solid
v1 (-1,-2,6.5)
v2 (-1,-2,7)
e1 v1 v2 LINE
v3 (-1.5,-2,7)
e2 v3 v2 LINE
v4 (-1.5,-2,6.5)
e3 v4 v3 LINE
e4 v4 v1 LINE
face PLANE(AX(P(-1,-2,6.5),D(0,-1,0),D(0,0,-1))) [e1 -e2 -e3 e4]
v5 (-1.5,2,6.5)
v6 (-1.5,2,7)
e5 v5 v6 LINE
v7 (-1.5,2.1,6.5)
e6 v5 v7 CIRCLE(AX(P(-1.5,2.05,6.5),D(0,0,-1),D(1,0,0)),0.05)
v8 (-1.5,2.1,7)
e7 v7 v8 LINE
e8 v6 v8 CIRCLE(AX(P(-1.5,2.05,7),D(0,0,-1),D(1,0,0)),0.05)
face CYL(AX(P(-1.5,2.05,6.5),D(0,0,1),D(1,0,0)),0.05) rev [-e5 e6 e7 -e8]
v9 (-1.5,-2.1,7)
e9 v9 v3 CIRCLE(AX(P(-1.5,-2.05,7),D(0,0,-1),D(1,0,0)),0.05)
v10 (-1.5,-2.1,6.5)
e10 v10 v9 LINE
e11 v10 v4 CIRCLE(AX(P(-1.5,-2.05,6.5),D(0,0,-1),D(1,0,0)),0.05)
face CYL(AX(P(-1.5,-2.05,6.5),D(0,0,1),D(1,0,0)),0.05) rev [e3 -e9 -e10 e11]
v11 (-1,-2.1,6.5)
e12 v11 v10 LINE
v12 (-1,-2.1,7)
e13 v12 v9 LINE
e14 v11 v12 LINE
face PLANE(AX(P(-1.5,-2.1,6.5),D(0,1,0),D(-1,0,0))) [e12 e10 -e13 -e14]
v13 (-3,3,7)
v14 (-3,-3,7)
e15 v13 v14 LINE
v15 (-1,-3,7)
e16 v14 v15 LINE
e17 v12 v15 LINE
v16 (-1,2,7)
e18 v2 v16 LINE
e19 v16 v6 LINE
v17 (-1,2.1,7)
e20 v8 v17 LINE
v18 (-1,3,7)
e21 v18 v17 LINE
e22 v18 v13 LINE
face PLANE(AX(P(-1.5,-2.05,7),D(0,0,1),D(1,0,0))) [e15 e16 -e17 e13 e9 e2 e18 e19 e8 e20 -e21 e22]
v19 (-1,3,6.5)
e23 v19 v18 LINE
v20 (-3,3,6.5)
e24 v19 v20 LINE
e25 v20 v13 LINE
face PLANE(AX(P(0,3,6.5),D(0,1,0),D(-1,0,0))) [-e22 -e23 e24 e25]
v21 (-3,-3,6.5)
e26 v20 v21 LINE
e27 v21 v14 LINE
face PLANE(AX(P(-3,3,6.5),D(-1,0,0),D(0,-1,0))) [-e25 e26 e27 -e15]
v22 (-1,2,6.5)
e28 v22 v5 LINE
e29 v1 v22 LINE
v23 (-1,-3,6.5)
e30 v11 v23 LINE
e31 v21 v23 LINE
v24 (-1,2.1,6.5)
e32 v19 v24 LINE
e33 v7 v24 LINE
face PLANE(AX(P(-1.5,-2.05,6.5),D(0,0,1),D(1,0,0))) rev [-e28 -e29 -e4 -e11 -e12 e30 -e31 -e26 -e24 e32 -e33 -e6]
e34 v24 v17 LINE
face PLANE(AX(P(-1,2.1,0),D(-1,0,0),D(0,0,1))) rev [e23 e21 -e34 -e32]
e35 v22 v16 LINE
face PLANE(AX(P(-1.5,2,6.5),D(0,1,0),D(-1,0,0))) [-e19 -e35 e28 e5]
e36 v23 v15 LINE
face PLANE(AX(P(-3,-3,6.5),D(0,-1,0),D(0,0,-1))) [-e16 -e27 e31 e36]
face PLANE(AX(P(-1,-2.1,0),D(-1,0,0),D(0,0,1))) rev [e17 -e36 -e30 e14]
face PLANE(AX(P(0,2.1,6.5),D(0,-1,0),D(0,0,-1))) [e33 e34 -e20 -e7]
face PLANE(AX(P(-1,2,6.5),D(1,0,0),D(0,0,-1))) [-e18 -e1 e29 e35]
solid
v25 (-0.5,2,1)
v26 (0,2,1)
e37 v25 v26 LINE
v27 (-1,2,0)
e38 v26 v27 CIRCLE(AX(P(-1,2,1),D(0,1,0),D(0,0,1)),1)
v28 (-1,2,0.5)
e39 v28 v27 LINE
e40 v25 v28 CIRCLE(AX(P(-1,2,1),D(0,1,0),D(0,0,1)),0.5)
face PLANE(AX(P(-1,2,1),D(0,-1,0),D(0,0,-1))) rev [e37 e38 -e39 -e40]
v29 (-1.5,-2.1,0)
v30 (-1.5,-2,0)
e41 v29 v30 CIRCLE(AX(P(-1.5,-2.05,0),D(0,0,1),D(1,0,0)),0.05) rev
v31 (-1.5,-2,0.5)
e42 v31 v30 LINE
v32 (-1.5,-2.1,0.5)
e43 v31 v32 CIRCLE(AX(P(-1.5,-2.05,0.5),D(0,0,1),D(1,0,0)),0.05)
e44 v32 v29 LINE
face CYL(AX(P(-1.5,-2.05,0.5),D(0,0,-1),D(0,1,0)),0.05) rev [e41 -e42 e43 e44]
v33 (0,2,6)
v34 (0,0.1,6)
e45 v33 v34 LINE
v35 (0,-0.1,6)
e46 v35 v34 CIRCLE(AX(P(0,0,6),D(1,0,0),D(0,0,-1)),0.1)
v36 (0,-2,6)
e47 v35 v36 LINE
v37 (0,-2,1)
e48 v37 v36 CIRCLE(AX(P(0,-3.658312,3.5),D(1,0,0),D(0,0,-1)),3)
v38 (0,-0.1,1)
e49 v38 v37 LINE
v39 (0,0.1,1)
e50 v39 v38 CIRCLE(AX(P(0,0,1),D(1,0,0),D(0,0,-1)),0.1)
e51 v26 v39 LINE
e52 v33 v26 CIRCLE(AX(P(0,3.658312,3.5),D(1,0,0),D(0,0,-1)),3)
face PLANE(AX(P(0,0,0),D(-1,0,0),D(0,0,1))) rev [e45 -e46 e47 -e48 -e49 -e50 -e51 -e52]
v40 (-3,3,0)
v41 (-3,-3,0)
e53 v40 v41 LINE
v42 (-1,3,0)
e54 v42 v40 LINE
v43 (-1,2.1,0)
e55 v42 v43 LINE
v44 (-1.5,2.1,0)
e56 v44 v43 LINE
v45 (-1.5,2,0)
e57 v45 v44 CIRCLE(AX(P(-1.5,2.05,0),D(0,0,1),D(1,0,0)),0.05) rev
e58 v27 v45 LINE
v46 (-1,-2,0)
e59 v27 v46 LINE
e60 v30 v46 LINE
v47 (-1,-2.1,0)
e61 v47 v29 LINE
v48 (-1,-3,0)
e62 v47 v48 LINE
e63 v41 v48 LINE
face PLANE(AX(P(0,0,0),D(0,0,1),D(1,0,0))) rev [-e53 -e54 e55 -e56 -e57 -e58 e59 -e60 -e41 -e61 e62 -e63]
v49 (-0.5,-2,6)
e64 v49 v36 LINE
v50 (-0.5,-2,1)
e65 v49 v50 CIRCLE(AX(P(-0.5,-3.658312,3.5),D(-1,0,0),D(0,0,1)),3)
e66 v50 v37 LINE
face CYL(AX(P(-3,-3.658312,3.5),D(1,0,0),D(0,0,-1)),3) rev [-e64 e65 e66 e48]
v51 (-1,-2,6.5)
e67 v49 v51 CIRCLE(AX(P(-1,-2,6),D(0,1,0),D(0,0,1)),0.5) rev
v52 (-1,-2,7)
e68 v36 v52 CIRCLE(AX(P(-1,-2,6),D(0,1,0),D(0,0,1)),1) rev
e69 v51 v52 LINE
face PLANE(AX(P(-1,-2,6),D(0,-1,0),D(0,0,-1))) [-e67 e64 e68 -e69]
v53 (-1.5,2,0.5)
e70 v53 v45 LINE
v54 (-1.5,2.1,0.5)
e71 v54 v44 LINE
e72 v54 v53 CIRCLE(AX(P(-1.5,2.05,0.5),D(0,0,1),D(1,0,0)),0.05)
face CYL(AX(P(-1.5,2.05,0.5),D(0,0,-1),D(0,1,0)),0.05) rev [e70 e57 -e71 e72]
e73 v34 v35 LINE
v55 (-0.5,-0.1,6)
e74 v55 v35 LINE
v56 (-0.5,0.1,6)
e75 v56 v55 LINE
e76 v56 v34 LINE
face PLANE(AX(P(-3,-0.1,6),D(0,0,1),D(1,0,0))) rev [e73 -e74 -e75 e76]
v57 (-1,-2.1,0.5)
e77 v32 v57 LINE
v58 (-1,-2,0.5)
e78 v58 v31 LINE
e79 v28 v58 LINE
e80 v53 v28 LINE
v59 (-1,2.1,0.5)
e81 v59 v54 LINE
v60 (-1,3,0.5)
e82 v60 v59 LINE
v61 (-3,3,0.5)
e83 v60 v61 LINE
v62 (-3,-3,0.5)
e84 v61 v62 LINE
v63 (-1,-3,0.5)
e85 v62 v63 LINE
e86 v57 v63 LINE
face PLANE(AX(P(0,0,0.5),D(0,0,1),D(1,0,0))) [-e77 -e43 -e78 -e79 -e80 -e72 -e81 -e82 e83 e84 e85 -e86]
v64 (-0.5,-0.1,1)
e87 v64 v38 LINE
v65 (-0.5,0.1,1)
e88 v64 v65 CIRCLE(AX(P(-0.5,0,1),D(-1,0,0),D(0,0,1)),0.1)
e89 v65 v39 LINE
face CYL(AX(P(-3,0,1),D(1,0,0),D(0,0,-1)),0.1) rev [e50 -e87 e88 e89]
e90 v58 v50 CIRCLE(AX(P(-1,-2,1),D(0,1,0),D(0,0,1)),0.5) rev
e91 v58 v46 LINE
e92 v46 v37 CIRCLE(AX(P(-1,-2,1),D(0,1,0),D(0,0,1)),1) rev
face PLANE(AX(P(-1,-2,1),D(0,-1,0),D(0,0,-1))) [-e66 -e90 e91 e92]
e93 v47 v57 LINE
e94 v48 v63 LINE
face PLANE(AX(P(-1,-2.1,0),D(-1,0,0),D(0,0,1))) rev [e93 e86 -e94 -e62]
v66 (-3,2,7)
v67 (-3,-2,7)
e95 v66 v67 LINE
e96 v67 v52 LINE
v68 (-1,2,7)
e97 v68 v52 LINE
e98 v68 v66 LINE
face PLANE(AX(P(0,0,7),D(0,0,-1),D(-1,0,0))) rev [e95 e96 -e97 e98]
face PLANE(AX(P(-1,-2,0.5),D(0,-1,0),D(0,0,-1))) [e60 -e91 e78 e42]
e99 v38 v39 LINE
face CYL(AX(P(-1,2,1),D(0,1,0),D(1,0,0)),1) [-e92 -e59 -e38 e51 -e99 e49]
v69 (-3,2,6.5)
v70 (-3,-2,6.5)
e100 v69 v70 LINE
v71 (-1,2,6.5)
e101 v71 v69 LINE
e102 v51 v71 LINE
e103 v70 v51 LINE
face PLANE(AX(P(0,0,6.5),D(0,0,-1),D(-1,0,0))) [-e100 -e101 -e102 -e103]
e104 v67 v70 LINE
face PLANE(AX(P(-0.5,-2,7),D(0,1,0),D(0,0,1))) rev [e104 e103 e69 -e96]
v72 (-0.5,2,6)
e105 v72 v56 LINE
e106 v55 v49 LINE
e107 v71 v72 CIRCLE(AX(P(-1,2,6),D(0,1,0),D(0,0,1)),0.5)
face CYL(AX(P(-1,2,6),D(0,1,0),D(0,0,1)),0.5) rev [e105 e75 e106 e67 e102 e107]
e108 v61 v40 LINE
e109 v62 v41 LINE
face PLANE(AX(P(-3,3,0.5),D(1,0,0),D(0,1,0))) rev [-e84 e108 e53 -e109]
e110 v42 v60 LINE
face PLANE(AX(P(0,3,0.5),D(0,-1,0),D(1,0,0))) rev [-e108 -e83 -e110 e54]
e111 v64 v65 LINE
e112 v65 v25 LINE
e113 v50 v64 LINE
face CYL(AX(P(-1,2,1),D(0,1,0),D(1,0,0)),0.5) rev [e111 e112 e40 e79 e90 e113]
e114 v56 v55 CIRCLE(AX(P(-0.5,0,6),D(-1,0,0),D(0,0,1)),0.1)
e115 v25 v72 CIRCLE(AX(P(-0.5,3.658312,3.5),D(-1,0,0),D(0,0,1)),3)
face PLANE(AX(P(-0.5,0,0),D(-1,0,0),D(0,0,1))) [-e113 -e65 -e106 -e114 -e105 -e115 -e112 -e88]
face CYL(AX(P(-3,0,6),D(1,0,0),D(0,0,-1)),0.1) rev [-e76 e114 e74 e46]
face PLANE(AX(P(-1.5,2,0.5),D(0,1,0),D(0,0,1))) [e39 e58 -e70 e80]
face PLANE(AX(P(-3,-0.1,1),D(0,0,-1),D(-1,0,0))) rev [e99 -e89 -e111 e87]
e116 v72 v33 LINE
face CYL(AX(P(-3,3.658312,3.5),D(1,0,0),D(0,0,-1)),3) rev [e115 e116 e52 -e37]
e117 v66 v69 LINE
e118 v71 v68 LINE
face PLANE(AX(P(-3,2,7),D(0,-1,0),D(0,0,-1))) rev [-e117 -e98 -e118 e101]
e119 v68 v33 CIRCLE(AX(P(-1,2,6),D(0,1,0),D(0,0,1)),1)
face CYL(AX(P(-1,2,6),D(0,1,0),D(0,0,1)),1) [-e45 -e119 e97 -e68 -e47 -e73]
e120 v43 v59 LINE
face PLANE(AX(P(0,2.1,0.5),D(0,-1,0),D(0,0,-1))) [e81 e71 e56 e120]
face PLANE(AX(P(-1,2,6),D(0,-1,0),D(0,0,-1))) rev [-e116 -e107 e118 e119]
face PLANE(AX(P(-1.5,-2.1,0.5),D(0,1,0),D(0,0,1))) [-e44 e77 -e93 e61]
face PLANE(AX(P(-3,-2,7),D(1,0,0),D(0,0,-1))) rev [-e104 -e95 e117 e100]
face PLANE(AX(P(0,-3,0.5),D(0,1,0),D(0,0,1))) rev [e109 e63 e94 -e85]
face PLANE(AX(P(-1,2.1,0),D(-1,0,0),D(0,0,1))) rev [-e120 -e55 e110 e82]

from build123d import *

# Parameters (mm, degrees)
SKETCH1_W                    = 6
SKETCH1_H                    = 3
BASE_FLANGE1_DEPTH           = 0.5
EDGE_FLANGE1_DEPTH           = 0.5
EDGE_FLANGE1_2_OUTLINE_W     = 0.5
EDGE_FLANGE1_2_OUTLINE_H     = 4
EDGE_FLANGE1_2_DEPTH         = 0.04719
EDGE_FLANGE1_START           = 1
EDGE_FLANGE1_3_OUTLINE_W     = 0.5
EDGE_FLANGE1_3_OUTLINE_H     = 4
EDGE_FLANGE1_3_DEPTH         = 6
EDGE_FLANGE1_START_2         = -2
EDGE_FLANGE1_4_DEPTH         = 4
EDGE_FLANGE1_5_DEPTH         = 4
BOSS_EXTRUDE2_DEPTH          = 0.5
EDGE_FLANGE2_STRIP_W         = 3
EDGE_FLANGE2_STRIP_H         = 0.5
EDGE_FLANGE2_STRIP_CUT_DEPTH = 4
EDGE_FLANGE2_DEPTH           = 4
CUT_EXTRUDE1_DEPTH           = 8.762087348
CUT_EXTRUDE1_DEPTH_BACK      = 8.762087348
SKETCH14_W                   = 1
SKETCH14_H                   = 0.9
CUT_EXTRUDE2_DEPTH           = 9.185352772
CUT_EXTRUDE2_DEPTH_BACK      = 9.185352772


with BuildPart() as part:
    # Base-Flange1: sheet metal written as solids
    # Sketch1 → Base-Flange1 (new body)
    with BuildSketch(Plane(origin=(0, 0, 0), x_dir=(0, 1, 0), z_dir=(0, 0, 1))):
        with Locations((0, 1.5)):
            Rectangle(SKETCH1_W, SKETCH1_H)
    extrude(amount=BASE_FLANGE1_DEPTH)

    # Edge-Flange1: read off the stored shape, not the designer's step
    # Edge-Flange1 outline → Edge-Flange1 (cut)
    with BuildSketch(Plane.XY):
        with BuildLine():
            Line((-1.5, 2), (0, 2))
            Line((0, 2), (0, 2.1))
            Line((0, 2.1), (-1.5, 2.1))
            ThreePointArc((-1.5, 2.1), (-1.55, 2.05), (-1.5, 2))
        make_face()
        with BuildLine():
            Line((0, -2.1), (0, -2))
            Line((0, -2), (-1.5, -2))
            ThreePointArc((-1.5, -2), (-1.55, -2.05), (-1.5, -2.1))
            Line((-1.5, -2.1), (0, -2.1))
        make_face()
    extrude(amount=EDGE_FLANGE1_DEPTH, mode=Mode.SUBTRACT)

    # Edge-Flange1 2 outline → Edge-Flange1 2 (cut)
    with BuildSketch(Plane.XY):
        with Locations((-0.25, 0)):
            Rectangle(EDGE_FLANGE1_2_OUTLINE_W, EDGE_FLANGE1_2_OUTLINE_H)
    extrude(amount=EDGE_FLANGE1_2_DEPTH, mode=Mode.SUBTRACT)

    # Edge-Flange1 4 outline → Edge-Flange1 4 (cut)
    with BuildSketch(Plane(origin=(0, 0, 0), x_dir=(1, 0, 0), z_dir=(0, 1, 0)).offset(EDGE_FLANGE1_START_2)):
        with BuildLine():
            ThreePointArc((-1, 0), (-0.5, -0.133974596), (-0.133974596, -0.5))
            Line((-0.133974596, -0.5), (0, -0.5))
            Line((0, -0.5), (0, -0.04719))
            Line((0, -0.04719), (-0.5, -0.04719))
            Line((-0.5, -0.04719), (-0.5, 0))
            Line((-0.5, 0), (-1, 0))
        make_face()
    extrude(amount=EDGE_FLANGE1_4_DEPTH, mode=Mode.SUBTRACT)



with BuildPart() as body_2:
    # Edge-Flange1 3 outline → Edge-Flange1 3 (new body)
    with BuildSketch(Plane.XY.offset(EDGE_FLANGE1_START)):
        with Locations((-0.25, 0)):
            Rectangle(EDGE_FLANGE1_3_OUTLINE_W, EDGE_FLANGE1_3_OUTLINE_H)
    extrude(amount=EDGE_FLANGE1_3_DEPTH)


with BuildPart() as part_1:
    add(part.part)

    add(body_2.part)  # Edge-Flange1 5 merges body 2
    # Edge-Flange1 5 outline → Edge-Flange1 5 (add)
    with BuildSketch(Plane(origin=(0, 0, 0), x_dir=(1, 0, 0), z_dir=(0, 1, 0)).offset(EDGE_FLANGE1_START_2)):
        with BuildLine():
            Line((-0.5, -1), (0, -1))
            ThreePointArc((0, -1), (-0.034074174, -0.741180955), (-0.133974596, -0.5))
            Line((-0.133974596, -0.5), (-1, -0.5))
            ThreePointArc((-1, -0.5), (-0.646446609, -0.646446609), (-0.5, -1))
        make_face()
    extrude(amount=EDGE_FLANGE1_5_DEPTH)

    # Edge-Flange2: sheet metal written as solids
    # Edge-Flange2 strip (on a plane across the edge) → Edge-Flange2 strip cut (cut)
    with BuildSketch(Plane(origin=(-0.5, -2, 7), x_dir=(0, 0, -1), z_dir=(0, 1, 0))):
        with Locations((-0.5, -0.25)):
            Rectangle(EDGE_FLANGE2_STRIP_W, EDGE_FLANGE2_STRIP_H)
    extrude(amount=EDGE_FLANGE2_STRIP_CUT_DEPTH, mode=Mode.SUBTRACT)

    # Edge-Flange2 section (on a plane across the edge) → Edge-Flange2 (add)
    with BuildSketch(Plane(origin=(-0.5, -2, 7), x_dir=(0, 0, -1), z_dir=(0, 1, 0))):
        with BuildLine():
            Line((0, 0.5), (0, 2.5))
            Line((0, 2.5), (0.5, 2.5))
            Line((0.5, 2.5), (0.5, 0.5))
            ThreePointArc((0.5, 0.5), (0.646446609, 0.146446609), (1, 0))
            Line((1, 0), (1, -0.5))
            ThreePointArc((1, -0.5), (0.292893219, -0.207106781), (0, 0.5))
        make_face()
    extrude(amount=EDGE_FLANGE2_DEPTH)


with BuildPart() as body_2_2:
    # Sketch10 → Boss-Extrude2 (new body)
    with BuildSketch(Plane(origin=(0, 0, 7), x_dir=(0, 1, 0), z_dir=(0, 0, 1))):
        with BuildLine():
            Line((3, 3), (-3, 3))
            Line((-3, 3), (-3, 0))
            Line((-3, 0), (-2.1, 0))
            Line((-2.1, 0), (-2.1, 1.5))
            ThreePointArc((-2.1, 1.5), (-2.05, 1.55), (-2, 1.5))
            Line((-2, 1.5), (-2, 1))
            Line((-2, 1), (2, 1))
            Line((2, 1), (2, 1.5))
            ThreePointArc((2, 1.5), (2.05, 1.55), (2.1, 1.5))
            Line((2.1, 1.5), (2.1, 0))
            Line((2.1, 0), (3, 0))
            Line((3, 0), (3, 3))
        make_face()
    extrude(amount=-BOSS_EXTRUDE2_DEPTH)


with BuildPart() as cut_extrude1_tool:
    # Sketch14 → Cut-Extrude1 (new, two sides: drawn at the far end of the back side and taken through both)
    with BuildSketch(Plane.XY.offset(0.5).offset(-CUT_EXTRUDE1_DEPTH_BACK)):
        with Locations((-0.5, 2.55)):
            Rectangle(SKETCH14_W, SKETCH14_H)
        with Locations((-0.5, -2.55)):
            Rectangle(SKETCH14_W, SKETCH14_H)
    extrude(amount=CUT_EXTRUDE1_DEPTH + CUT_EXTRUDE1_DEPTH_BACK)


with BuildPart() as part_2:
    add(part_1.part)

    # Cut-Extrude1: cut by cut_extrude1_tool
    add(cut_extrude1_tool.part, mode=Mode.SUBTRACT)

    # Sketch15 → Cut-Extrude2 (cut, two sides: drawn at the far end of the back side and taken through both)
    with BuildSketch(Plane.YZ.offset(-CUT_EXTRUDE2_DEPTH_BACK)):
        with BuildLine():
            Line((-2, 6), (-2, 1))
            ThreePointArc((-2, 1), (-0.658312395, 3.5), (-2, 6))
        make_face()
        with BuildLine():
            Line((2, 6), (2, 1))
            ThreePointArc((2, 1), (0.658312395, 3.5), (2, 6))
        make_face()
        with BuildLine():
            Line((-0.1, 6), (0.1, 6))
            ThreePointArc((0.1, 6), (0, 5.9), (-0.1, 6))
        make_face()
        with BuildLine():
            Line((-0.1, 1), (0.1, 1))
            ThreePointArc((0.1, 1), (0, 1.1), (-0.1, 1))
        make_face()
    extrude(amount=CUT_EXTRUDE2_DEPTH + CUT_EXTRUDE2_DEPTH_BACK, mode=Mode.SUBTRACT)


with BuildPart() as body_2_2_1:
    add(body_2_2.part)

    # Cut-Extrude1: cut by cut_extrude1_tool
    add(cut_extrude1_tool.part, mode=Mode.SUBTRACT)


solid = Compound([part_2.part, body_2_2_1.part])
